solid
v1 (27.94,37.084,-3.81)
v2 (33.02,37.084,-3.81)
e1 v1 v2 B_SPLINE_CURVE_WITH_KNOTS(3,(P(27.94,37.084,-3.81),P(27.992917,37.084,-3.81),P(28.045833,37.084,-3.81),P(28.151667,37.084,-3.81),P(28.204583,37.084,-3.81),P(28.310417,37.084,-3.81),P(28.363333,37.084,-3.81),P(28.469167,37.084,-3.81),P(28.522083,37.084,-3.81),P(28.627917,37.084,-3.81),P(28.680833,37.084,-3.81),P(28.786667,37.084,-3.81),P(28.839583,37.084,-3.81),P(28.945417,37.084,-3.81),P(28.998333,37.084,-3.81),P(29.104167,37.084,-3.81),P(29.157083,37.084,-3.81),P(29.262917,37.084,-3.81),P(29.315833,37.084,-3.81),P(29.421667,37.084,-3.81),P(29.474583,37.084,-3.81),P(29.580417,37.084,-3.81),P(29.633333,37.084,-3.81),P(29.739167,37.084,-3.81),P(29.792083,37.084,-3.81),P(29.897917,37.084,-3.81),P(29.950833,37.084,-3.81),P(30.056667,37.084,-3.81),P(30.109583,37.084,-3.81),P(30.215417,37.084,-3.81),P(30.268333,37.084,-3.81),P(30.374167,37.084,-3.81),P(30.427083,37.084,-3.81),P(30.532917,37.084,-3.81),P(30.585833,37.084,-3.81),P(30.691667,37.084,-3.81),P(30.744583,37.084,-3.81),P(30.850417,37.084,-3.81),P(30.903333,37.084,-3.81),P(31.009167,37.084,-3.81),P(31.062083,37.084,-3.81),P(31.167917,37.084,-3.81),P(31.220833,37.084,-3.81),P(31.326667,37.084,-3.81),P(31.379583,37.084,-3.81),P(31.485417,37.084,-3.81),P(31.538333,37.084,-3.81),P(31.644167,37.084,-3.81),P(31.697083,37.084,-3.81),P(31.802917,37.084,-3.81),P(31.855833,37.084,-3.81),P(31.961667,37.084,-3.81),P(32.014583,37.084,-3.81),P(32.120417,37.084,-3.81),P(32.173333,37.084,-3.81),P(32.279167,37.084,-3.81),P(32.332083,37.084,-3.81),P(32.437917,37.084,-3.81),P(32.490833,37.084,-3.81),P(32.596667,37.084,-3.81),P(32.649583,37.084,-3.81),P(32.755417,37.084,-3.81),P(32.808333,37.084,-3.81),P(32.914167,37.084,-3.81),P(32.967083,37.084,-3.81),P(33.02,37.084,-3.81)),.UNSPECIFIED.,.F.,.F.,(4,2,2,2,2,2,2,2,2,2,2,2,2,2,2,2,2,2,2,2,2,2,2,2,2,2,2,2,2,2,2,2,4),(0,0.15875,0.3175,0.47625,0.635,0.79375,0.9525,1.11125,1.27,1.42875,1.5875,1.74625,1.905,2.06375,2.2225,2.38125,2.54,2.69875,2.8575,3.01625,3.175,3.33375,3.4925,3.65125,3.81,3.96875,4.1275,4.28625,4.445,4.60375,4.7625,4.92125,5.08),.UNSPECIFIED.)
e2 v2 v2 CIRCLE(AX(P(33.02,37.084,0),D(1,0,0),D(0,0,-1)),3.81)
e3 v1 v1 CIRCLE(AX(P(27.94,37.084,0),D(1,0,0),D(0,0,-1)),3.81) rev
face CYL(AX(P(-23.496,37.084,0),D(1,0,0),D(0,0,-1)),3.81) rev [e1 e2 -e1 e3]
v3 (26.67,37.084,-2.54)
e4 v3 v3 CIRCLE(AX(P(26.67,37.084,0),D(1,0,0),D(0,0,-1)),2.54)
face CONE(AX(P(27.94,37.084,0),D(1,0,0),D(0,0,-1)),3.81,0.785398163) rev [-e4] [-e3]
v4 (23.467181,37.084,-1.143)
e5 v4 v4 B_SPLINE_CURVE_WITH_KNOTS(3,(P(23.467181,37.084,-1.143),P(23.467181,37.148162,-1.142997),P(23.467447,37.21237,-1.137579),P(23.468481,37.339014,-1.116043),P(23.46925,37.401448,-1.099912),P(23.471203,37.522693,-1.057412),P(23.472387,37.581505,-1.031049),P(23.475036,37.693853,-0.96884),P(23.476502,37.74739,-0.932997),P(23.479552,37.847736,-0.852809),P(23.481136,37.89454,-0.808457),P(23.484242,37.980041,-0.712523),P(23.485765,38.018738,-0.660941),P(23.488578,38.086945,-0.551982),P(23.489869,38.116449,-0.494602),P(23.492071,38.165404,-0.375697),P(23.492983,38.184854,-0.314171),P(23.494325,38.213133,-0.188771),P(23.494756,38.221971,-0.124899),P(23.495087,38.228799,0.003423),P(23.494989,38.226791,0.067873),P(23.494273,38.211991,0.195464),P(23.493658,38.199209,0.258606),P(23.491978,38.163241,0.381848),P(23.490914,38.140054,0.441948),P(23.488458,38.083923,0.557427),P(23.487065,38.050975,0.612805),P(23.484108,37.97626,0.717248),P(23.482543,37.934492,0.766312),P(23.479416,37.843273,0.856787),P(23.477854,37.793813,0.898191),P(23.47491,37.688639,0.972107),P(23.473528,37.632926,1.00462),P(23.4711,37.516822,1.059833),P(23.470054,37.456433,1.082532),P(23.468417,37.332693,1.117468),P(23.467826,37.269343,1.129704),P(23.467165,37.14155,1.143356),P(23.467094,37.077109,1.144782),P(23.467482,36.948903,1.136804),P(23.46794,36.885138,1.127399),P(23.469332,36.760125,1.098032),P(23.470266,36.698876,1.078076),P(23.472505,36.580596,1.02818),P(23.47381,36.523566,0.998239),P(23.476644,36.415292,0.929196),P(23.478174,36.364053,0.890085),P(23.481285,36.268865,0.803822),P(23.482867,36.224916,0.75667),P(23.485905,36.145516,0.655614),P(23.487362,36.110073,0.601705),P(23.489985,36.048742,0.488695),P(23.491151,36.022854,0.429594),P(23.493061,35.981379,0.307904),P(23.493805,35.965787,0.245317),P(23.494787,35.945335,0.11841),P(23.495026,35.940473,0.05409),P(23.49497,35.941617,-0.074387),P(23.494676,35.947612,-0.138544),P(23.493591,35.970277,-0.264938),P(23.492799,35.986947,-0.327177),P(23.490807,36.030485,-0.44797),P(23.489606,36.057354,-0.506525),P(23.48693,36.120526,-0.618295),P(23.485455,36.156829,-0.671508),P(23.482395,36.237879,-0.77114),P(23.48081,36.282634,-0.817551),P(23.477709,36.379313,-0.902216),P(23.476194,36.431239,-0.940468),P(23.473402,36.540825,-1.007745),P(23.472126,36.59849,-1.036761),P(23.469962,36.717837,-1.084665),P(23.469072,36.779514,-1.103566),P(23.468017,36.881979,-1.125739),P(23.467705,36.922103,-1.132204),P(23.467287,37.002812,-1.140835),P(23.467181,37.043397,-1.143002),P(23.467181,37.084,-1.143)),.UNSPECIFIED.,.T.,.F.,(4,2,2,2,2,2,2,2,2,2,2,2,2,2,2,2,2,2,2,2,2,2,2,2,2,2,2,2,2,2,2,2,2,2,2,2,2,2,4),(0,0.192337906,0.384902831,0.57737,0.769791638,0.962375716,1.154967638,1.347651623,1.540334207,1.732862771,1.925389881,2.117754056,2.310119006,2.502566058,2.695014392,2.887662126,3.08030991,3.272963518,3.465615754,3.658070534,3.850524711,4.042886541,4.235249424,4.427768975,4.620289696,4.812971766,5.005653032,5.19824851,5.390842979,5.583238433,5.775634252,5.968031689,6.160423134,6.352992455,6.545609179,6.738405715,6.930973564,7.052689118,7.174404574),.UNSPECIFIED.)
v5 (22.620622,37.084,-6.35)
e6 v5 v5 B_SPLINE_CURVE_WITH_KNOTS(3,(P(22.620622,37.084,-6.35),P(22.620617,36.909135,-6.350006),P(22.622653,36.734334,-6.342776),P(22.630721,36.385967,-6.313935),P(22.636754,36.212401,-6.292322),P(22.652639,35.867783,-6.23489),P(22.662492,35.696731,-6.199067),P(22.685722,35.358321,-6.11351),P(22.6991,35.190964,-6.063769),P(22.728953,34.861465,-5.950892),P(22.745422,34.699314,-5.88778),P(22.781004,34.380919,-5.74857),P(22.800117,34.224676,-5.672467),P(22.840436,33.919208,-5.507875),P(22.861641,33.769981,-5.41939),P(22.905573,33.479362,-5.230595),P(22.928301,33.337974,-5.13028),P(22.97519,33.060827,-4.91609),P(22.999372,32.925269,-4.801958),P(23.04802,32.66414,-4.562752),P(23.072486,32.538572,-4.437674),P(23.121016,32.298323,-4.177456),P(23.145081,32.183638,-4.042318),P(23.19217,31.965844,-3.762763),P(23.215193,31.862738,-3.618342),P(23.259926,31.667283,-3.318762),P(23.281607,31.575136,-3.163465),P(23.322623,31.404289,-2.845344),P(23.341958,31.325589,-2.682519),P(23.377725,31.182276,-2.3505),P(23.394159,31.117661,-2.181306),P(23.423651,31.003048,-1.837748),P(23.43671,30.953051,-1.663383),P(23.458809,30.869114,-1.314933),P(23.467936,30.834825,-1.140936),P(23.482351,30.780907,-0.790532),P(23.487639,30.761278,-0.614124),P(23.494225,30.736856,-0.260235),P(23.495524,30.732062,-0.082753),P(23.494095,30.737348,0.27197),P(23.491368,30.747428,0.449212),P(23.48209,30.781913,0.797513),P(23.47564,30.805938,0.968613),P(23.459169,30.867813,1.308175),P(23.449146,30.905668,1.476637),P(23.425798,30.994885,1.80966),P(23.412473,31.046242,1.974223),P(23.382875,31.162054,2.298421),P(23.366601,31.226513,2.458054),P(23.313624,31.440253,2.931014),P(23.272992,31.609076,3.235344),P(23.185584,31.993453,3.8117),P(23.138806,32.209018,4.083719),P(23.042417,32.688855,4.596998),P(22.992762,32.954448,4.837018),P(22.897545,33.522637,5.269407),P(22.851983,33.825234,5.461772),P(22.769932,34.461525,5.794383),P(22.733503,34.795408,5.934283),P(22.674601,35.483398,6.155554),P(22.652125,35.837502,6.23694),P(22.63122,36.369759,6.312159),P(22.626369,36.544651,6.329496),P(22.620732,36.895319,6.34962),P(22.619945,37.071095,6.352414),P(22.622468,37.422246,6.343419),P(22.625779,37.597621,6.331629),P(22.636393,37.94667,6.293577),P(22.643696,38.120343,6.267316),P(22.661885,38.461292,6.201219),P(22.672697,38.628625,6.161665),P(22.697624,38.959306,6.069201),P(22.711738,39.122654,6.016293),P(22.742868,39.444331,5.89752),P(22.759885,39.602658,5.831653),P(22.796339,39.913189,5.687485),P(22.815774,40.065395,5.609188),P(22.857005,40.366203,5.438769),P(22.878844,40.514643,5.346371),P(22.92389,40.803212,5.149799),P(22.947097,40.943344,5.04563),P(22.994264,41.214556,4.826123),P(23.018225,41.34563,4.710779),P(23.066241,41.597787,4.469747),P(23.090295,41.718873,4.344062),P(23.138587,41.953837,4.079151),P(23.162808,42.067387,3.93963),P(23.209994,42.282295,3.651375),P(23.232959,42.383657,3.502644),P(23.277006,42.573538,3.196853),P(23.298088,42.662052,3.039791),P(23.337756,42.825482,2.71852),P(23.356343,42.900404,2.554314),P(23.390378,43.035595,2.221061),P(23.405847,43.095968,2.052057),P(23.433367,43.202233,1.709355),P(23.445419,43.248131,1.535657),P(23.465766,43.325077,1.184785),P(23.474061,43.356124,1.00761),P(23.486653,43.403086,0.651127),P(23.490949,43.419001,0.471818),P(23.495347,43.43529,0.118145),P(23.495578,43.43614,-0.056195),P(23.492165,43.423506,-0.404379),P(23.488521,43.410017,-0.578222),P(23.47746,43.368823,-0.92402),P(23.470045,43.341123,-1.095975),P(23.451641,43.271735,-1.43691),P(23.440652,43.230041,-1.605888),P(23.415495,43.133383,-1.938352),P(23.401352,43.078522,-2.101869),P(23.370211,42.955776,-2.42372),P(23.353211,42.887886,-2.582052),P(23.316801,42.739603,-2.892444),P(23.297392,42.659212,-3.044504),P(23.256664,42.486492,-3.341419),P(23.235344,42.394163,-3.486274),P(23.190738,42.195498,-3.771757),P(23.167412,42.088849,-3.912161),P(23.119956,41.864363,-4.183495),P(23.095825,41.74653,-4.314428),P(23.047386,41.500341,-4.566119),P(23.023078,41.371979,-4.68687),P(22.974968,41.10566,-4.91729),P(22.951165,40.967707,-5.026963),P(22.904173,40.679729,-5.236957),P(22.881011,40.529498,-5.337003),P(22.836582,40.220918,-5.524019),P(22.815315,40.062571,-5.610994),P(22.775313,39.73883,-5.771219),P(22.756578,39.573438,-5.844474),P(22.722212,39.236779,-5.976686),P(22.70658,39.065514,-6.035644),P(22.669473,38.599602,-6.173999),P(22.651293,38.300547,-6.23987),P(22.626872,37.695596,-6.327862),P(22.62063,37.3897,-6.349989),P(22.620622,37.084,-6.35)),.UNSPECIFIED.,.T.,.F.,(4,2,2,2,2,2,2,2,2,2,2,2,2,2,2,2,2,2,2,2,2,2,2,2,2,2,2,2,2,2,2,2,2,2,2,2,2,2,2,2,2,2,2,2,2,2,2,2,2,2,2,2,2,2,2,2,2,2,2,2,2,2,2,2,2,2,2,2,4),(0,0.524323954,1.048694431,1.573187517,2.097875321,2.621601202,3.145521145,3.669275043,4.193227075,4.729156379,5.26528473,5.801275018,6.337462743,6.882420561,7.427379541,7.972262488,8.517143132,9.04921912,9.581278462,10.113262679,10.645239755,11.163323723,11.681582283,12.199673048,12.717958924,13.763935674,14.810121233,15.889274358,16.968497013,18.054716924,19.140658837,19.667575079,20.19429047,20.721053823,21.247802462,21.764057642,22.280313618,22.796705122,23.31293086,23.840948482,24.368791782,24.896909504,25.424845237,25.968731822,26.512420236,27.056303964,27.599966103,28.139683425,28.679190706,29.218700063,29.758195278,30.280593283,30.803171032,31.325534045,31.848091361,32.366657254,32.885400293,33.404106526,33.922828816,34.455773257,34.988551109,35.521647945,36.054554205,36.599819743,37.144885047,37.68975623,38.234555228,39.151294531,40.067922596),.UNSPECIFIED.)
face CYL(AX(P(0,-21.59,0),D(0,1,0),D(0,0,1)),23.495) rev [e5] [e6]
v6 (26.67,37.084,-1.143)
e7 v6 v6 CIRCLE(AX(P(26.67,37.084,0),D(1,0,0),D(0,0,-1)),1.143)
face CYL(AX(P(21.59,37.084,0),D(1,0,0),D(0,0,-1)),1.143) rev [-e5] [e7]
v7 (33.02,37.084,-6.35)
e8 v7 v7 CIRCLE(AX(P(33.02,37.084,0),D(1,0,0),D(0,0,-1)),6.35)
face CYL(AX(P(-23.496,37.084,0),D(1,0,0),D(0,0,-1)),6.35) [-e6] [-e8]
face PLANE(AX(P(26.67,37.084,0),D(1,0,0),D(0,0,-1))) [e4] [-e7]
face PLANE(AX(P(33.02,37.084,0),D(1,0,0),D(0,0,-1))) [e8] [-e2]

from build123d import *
from build123d.topology import SkipClean

# Parameters (mm, degrees)
SKETCH2_R                            = 23.495
INITIAL_DISK_DEPTH                   = 7.62
HOLLOW_START                         = 54.61
HOLLOW_CYLINDER_DEPTH                = 54.61
SKETCH5_R                            = 1.524
Y_SERVO_HOLE_1_DEPTH                 = 9.398
SKETCH8_R                            = 3.175
Y_SERVO_HOLE_3_DEPTH                 = 5.715
BOSS_EXTRUDE2_REACH                  = 65.924
BOSS_EXTRUDE2_DIRECTION_2_REACH      = 65.924
CUT_EXTRUDE3_DEPTH                   = 64.924034212
SKETCH9_W                            = 2.54
SKETCH9_H                            = 30.48
X_SERVO_TOP_MOUNT_DEPTH              = 6.35
FILLET3_START                        = -22
FILLET3_DEPTH                        = 45.495
SKETCH11_R                           = 2.286
X_SERVO_TOP_HOLES_DEPTH              = 2.54
X_START                              = 6.858
X_SERVO_BOTTOM_MOUNT_DEPTH           = 6.858
SKETCH14_R                           = 2.3495
X_SERVO_BOTTOM_HOLES_DEPTH           = 6.35
SKETCH15_R                           = 4.445
X_SERVO_BOTTOM_SCREW_CLEARANCE_DEPTH = 16.51
SKETCH18_W                           = 5.08
SKETCH18_H                           = 22.86
CUT_EXTRUDE2_DEPTH                   = 2.54
FILLET1_R                            = 1.27
BOSS_EXTRUDE1_DEPTH                  = 1.905
BOSS_EXTRUDE3_REACH                  = 70.14
SKETCH23_W                           = 1.905
SKETCH23_H                           = 0.757768233
BOSS_EXTRUDE4_DEPTH                  = 2.54
SKETCH24_R                           = 0.6096
CUT_EXTRUDE4_DEPTH                   = 10.16
BOSS_EXTRUDE5_REACH                  = 84.026
BOSS_EXTRUDE5_END_RADIUS             = 23.495
SKETCH16_R                           = 6.35
SKETCH16_R_2                         = 3.81
SKETCH26_R                           = 23.495
CUT_EXTRUDE5_DEPTH                   = 76.2
BOSS_EXTRUDE6_START                  = 33.2739999
BOSS_EXTRUDE6_DEPTH                  = 7.6200001
SKETCH29_R                           = 1.143
CUT_EXTRUDE6_DEPTH                   = 5.08
CHAMFER1_SIZE                        = 1.27


with BuildPart() as part:
    # Sketch2 → Initial Disk (new body)
    with BuildSketch(Plane(origin=(0, 0, 0), x_dir=(1, 0, 0), z_dir=(0, 1, 0))):
        with Locations(Location((0, 0, 0), (0, 0, 270))):
            Circle(SKETCH2_R)
    extrude(amount=-INITIAL_DISK_DEPTH)

    # Sketch3 → Hollow Cylinder (add)
    with SkipClean():  # the faces are left unmerged after this step: merging them gives an invalid solid
        with BuildSketch(Plane(origin=(0, 0, 0), x_dir=(1, 0, 0), z_dir=(0, 1, 0)).offset(HOLLOW_START)):
            with BuildLine():
                Line((-17.770847855, 11.104458182), (-20.705217543, 11.104458182))
                ThreePointArc((-20.705217543, 11.104458182), (23.495, 0), (-20.705217543, -11.104458182))
                Line((-20.705217543, -11.104458182), (-17.770847855, -11.104458182))
                ThreePointArc((-17.770847855, -11.104458182), (20.955, 0), (-17.770847855, 11.104458182))
            make_face()
        extrude(amount=-HOLLOW_CYLINDER_DEPTH)

    # Sketch5 → Y Servo Hole 1 (cut)
    with SkipClean():  # the faces are left unmerged after this step: merging them gives an invalid solid
        with BuildSketch(Plane.XZ.offset(7.62)):
            with Locations(Location((0, 0, 0), (0, 0, 270))):
                Circle(SKETCH5_R)
        extrude(amount=-Y_SERVO_HOLE_1_DEPTH, mode=Mode.SUBTRACT)

    # Sketch8 → Y Servo Hole 3 (cut)
    with SkipClean():  # the faces are left unmerged after this step: merging them gives an invalid solid
        with BuildSketch(Plane(origin=(0, 0, 0), x_dir=(1, 0, 0), z_dir=(0, 1, 0))):
            with Locations(Location((0, 0, 0), (0, 0, 270))):
                Circle(SKETCH8_R)
        extrude(amount=-Y_SERVO_HOLE_3_DEPTH, mode=Mode.SUBTRACT)

    # Sketch20 → Boss-Extrude2 (add, up to next)
    with BuildSketch(Plane(origin=(0, 0, 0), x_dir=(0, 0, -1), z_dir=(1, 0, 0)), mode=Mode.PRIVATE) as boss_extrude2_sk1:
        Polygon((23.495, 41.342827261), (14.205225637, 54.61), (11.104458182, 54.61), (21.414353808, 39.885943113), align=None)
    boss_extrude2_tool1 = extrude(boss_extrude2_sk1.sketch, amount=BOSS_EXTRUDE2_REACH, mode=Mode.PRIVATE) - part.part
    boss_extrude2 = boss_extrude2_tool1.solids().sort_by_distance((0, 47.605874, -17.532286))[0]
    add(boss_extrude2)

    # Sketch20 → Boss-Extrude2 direction 2 (add, up to next)
    with BuildSketch(Plane(origin=(0, 0, 0), x_dir=(0, 0, -1), z_dir=(1, 0, 0)), mode=Mode.PRIVATE) as boss_extrude2_direction_2_sk1:
        Polygon((23.495, 41.342827261), (14.205225637, 54.61), (11.104458182, 54.61), (21.414353808, 39.885943113), align=None)
    boss_extrude2_direction_2_tool1 = extrude(boss_extrude2_direction_2_sk1.sketch, amount=-BOSS_EXTRUDE2_DIRECTION_2_REACH, mode=Mode.PRIVATE) - part.part
    boss_extrude2_direction_2 = boss_extrude2_direction_2_tool1.solids().sort_by_distance((0, 47.605874, -17.532286))[0]
    add(boss_extrude2_direction_2)

    # Sketch21 → Cut-Extrude3 (cut, symmetric)
    with SkipClean():  # the faces are left unmerged after this step: merging them gives an invalid solid
        with BuildSketch(Plane(origin=(0, 0, 0), x_dir=(0, 0, -1), z_dir=(1, 0, 0))):
            Polygon((23.495, 54.61), (14.205225637, 54.61), (23.495, 41.342827261), align=None)
        cut_extrude3 = extrude(amount=CUT_EXTRUDE3_DEPTH, both=True, mode=Mode.SUBTRACT)

    # Mirror2: Boss-Extrude2, Boss-Extrude2 direction 2, Cut-Extrude3 across plane
    with SkipClean():  # the faces are left unmerged after this step: merging them gives an invalid solid
        add(boss_extrude2.mirror(Plane.XY))
        add(boss_extrude2_direction_2.mirror(Plane.XY))
        add(cut_extrude3.mirror(Plane.XY), mode=Mode.SUBTRACT)

    # Sketch9 → X Servo Top Mount (add)
    with SkipClean():  # the faces are left unmerged after this step: merging them gives an invalid solid
        with BuildSketch(Plane(origin=(0, 54.61, 0), x_dir=(1, 0, 0), z_dir=(0, 1, 0))):
            with Locations((-8.5344, 0)):
                Rectangle(SKETCH9_W, SKETCH9_H)
        extrude(amount=-X_SERVO_TOP_MOUNT_DEPTH)

    # Fillet3: read off the stored shape, not the designer's step
    # Fillet3 outline → Fillet3 (cut)
    with SkipClean():  # the faces are left unmerged after this step: merging them gives an invalid solid
        with BuildSketch(Plane.YZ.offset(FILLET3_START)):
            with BuildLine():
                Line((53.132189057, 15.24), (50.819094519, 16.859646232))
                ThreePointArc((50.819094519, 16.859646232), (53.605526779, 13.682328823), (54.61, 9.577382514))
                Line((54.61, 9.577382514), (54.61, 15.24))
                Line((54.61, 15.24), (53.132189057, 15.24))
            make_face()
            with BuildLine():
                ThreePointArc((54.61, -9.577384558), (53.605525966, -13.682330385), (50.81909331, -16.859647079))
                Line((50.81909331, -16.859647079), (53.132189057, -15.24))
                Line((53.132189057, -15.24), (54.61, -15.24))
                Line((54.61, -15.24), (54.61, -9.577384558))
            make_face()
        extrude(amount=FILLET3_DEPTH, mode=Mode.SUBTRACT)

    # Sketch11 → X Servo Top Holes (cut)
    with SkipClean():  # the faces are left unmerged after this step: merging them gives an invalid solid
        with BuildSketch(Plane.ZY.offset(9.8044)):
            with Locations((-4.953, 51.689)):
                Circle(SKETCH11_R)
            with Locations(Location((4.953, 51.689, 0), (0, 0, 180))):
                Circle(SKETCH11_R)
        extrude(amount=-X_SERVO_TOP_HOLES_DEPTH, mode=Mode.SUBTRACT)

    # Sketch13 → X Servo Bottom Mount (add)
    with SkipClean():  # the faces are left unmerged after this step: merging them gives an invalid solid
        with BuildSketch(Plane(origin=(0, 0, 0), x_dir=(1, 0, 0), z_dir=(0, 1, 0)).offset(X_START)):
            with BuildLine():
                Line((-9.8044, 18.519874882), (-9.8044, -18.519874882))
                ThreePointArc((-9.8044, -18.519874882), (-8.553269609, -19.129913852), (-7.2644, -19.65554674))
                Line((-7.2644, -19.65554674), (-7.2644, 19.65554674))
                ThreePointArc((-7.2644, 19.65554674), (-8.553269609, 19.129913852), (-9.8044, 18.519874882))
            make_face()
        extrude(amount=-X_SERVO_BOTTOM_MOUNT_DEPTH)

    # Sketch14 → X Servo Bottom Holes (cut)
    with SkipClean():  # the faces are left unmerged after this step: merging them gives an invalid solid
        with BuildSketch(Plane.ZY.offset(9.8044)):
            with Locations(Location((-4.953, 2.286, 0), (0, 0, 283.351184332))):
                Circle(SKETCH14_R)
            with Locations(Location((4.953, 2.286, 0), (0, 0, 283.351184332))):
                Circle(SKETCH14_R)
        extrude(amount=-X_SERVO_BOTTOM_HOLES_DEPTH, mode=Mode.SUBTRACT)

    # Sketch15 → X Servo Bottom Screw Clearance (cut)
    with SkipClean():  # the faces are left unmerged after this step: merging them gives an invalid solid
        with BuildSketch(Plane.ZY.offset(9.8044)):
            with Locations((-4.9784, 2.98958)):
                Circle(SKETCH15_R)
            with Locations((4.9784, 2.98958)):
                Circle(SKETCH15_R)
        extrude(amount=X_SERVO_BOTTOM_SCREW_CLEARANCE_DEPTH, mode=Mode.SUBTRACT)

    # Sketch18 → Cut-Extrude2 (cut)
    with SkipClean():  # the faces are left unmerged after this step: merging them gives an invalid solid
        with BuildSketch(Plane(origin=(0, 0, 0), x_dir=(1, 0, 0), z_dir=(0, 1, 0))):
            with Locations((-4.7244, 0)):
                Rectangle(SKETCH18_W, SKETCH18_H)
        extrude(amount=-CUT_EXTRUDE2_DEPTH, mode=Mode.SUBTRACT)

    # Fillet1
    fillet1_edges = [part.edges().sort_by_distance(p)[0] for p in [
        (-2.1844, -1.27, 2.304131429),
        (-2.1844, -1.27, -2.304131429),
    ]]
    fillet(fillet1_edges, radius=FILLET1_R)

    # Sketch19 → Boss-Extrude1 (add)
    with SkipClean():  # the faces are left unmerged after this step: merging them gives an invalid solid
        with BuildSketch(Plane(origin=(-7.2644, 0, 0), x_dir=(0, 0, -1), z_dir=(1, 0, 0))):
            Polygon((-8.032586336, 6.858), (-10.672231767, 2.286), (-10.672231767, -2.54), (-8.139638623, -2.54), (-1.766361377, -2.54), (0, -2.54), (0, 1.00284174), (0, 3.61315235), (-1.873413664, 6.858), align=None)
            Polygon((-2.973265927, 5.715), (-6.932734073, 5.715), (-8.912468146, 2.286), (-6.932734073, -1.143), (-2.973265927, -1.143), (-0.993531854, 2.286), align=None, mode=Mode.SUBTRACT)
        boss_extrude1 = extrude(amount=BOSS_EXTRUDE1_DEPTH)

    # Mirror1: Boss-Extrude1 across plane
    with SkipClean():  # the faces are left unmerged after this step: merging them gives an invalid solid
        add(boss_extrude1.mirror(Plane.XY))

    # Sketch22 → Boss-Extrude3 (add, up to next)
    with BuildSketch(Plane.ZY.offset(9.8044), mode=Mode.PRIVATE) as boss_extrude3_sk1:
        with BuildLine():
            ThreePointArc((11.210377262, 54.458731878), (11.157446673, 54.468457219), (11.104458182, 54.477861962))
            Line((11.104458182, 54.477861962), (11.104458182, 48.26))
            Line((11.104458182, 48.26), (15.24, 48.26))
            Line((15.24, 48.26), (15.24, 48.703834196))
            Line((15.24, 48.703834196), (11.210377262, 54.458731878))
        make_face()
    boss_extrude3_tool1 = extrude(boss_extrude3_sk1.sketch, amount=BOSS_EXTRUDE3_REACH, mode=Mode.PRIVATE) - part.part
    # Sketch22 → Boss-Extrude3 (add, up to next)
    with BuildSketch(Plane.ZY.offset(9.8044), mode=Mode.PRIVATE) as boss_extrude3_sk2:
        with BuildLine():
            Line((-15.24, 48.26), (-11.104458182, 48.26))
            Line((-11.104458182, 48.26), (-11.104458182, 54.477861962))
            ThreePointArc((-11.104458182, 54.477861962), (-11.157446673, 54.468457219), (-11.210377262, 54.458731878))
            Line((-11.210377262, 54.458731878), (-15.24, 48.703834196))
            Line((-15.24, 48.703834196), (-15.24, 48.26))
        make_face()
    boss_extrude3_tool2 = extrude(boss_extrude3_sk2.sketch, amount=BOSS_EXTRUDE3_REACH, mode=Mode.PRIVATE) - part.part
    add(boss_extrude3_tool1.solids().sort_by_distance((-9.8044, 50.384277, 12.573742))[0])
    add(boss_extrude3_tool2.solids().sort_by_distance((-9.8044, 50.384277, -12.573742))[0])

    # Sketch23 → Boss-Extrude4 (add)
    with SkipClean():  # the faces are left unmerged after this step: merging them gives an invalid solid
        with BuildSketch(Plane(origin=(0, -2.54, 0), x_dir=(1, 0, 0), z_dir=(0, 1, 0))):
            with Locations((-6.3119, 11.051115884)):
                Rectangle(SKETCH23_W, SKETCH23_H)
            with Locations((-6.3119, -11.051115884)):
                Rectangle(SKETCH23_W, SKETCH23_H)
        extrude(amount=BOSS_EXTRUDE4_DEPTH)

    # Sketch24 → Cut-Extrude4 (cut)
    with SkipClean():  # the faces are left unmerged after this step: merging them gives an invalid solid
        with BuildSketch(Plane.XZ.offset(7.62)):
            with Locations(Location((0, 6.9977, 0), (0, 0, 270))):
                Circle(SKETCH24_R)
            with Locations(Location((6.9977, 0, 0), (0, 0, 270))):
                Circle(SKETCH24_R)
            with Locations(Location((0, -6.9977, 0), (0, 0, 270))):
                Circle(SKETCH24_R)
        extrude(amount=-CUT_EXTRUDE4_DEPTH, mode=Mode.SUBTRACT)

    # Boss-Extrude5: up to this cylinder (the profile starts outside it)
    with SkipClean():  # the faces are left unmerged after this step: merging them gives an invalid solid
        boss_extrude5_end = Plane(origin=(0, 37.084, 0), z_dir=(0, 1, 0)) * Cylinder(BOSS_EXTRUDE5_END_RADIUS, 216.042, mode=Mode.PRIVATE)
        # Sketch16 → Boss-Extrude5 (add, up to the surface)
        with BuildSketch(Plane(origin=(33.02, 0, 0), x_dir=(0, 0, -1), z_dir=(1, 0, 0)), mode=Mode.PRIVATE) as boss_extrude5_sk1:
            with Locations((0, 37.084)):
                Circle(SKETCH16_R)
            with Locations((0, 37.084)):
                Circle(SKETCH16_R_2, mode=Mode.SUBTRACT)
        boss_extrude5_tool1 = extrude(boss_extrude5_sk1.sketch, amount=-BOSS_EXTRUDE5_REACH, mode=Mode.PRIVATE) - boss_extrude5_end
        add(boss_extrude5_tool1.solids().sort_by_distance((33.02, 37.084, 6.170395))[0])

    # Sketch26 → Cut-Extrude5 (cut)
    with BuildSketch(Plane(origin=(0, 54.61, 0), x_dir=(1, 0, 0), z_dir=(0, 1, 0))):
        Circle(SKETCH26_R)
    extrude(amount=-CUT_EXTRUDE5_DEPTH, mode=Mode.SUBTRACT)

    # Boss-Extrude6: read off the stored shape, not the designer's step
    # Boss-Extrude6 outline → Boss-Extrude6 (add)
    with BuildSketch(Plane(origin=(0, 0, 0), x_dir=(1, 0, 0), z_dir=(0, 1, 0)).offset(BOSS_EXTRUDE6_START)):
        with BuildLine():
            ThreePointArc((22.956807814, 5), (23.495, 0), (22.956807814, -5))
            Line((22.956807814, -5), (26.67, -5))
            Line((26.67, -5), (26.67, 5))
            Line((26.67, 5), (22.956807814, 5))
        make_face()
    extrude(amount=BOSS_EXTRUDE6_DEPTH)

    # Sketch29 → Cut-Extrude6 (cut)
    with BuildSketch(Plane(origin=(26.67, 0, 0), x_dir=(0, 0, -1), z_dir=(1, 0, 0))):
        with Locations((0, 37.084)):
            Circle(SKETCH29_R)
    extrude(amount=-CUT_EXTRUDE6_DEPTH, mode=Mode.SUBTRACT)

    # Chamfer1
    chamfer1_edges = [part.edges().sort_by_distance(p)[0] for p in [
        (26.67, 37.084, 3.81),
    ]]
    chamfer(chamfer1_edges, length=CHAMFER1_SIZE)


solid = part.part
